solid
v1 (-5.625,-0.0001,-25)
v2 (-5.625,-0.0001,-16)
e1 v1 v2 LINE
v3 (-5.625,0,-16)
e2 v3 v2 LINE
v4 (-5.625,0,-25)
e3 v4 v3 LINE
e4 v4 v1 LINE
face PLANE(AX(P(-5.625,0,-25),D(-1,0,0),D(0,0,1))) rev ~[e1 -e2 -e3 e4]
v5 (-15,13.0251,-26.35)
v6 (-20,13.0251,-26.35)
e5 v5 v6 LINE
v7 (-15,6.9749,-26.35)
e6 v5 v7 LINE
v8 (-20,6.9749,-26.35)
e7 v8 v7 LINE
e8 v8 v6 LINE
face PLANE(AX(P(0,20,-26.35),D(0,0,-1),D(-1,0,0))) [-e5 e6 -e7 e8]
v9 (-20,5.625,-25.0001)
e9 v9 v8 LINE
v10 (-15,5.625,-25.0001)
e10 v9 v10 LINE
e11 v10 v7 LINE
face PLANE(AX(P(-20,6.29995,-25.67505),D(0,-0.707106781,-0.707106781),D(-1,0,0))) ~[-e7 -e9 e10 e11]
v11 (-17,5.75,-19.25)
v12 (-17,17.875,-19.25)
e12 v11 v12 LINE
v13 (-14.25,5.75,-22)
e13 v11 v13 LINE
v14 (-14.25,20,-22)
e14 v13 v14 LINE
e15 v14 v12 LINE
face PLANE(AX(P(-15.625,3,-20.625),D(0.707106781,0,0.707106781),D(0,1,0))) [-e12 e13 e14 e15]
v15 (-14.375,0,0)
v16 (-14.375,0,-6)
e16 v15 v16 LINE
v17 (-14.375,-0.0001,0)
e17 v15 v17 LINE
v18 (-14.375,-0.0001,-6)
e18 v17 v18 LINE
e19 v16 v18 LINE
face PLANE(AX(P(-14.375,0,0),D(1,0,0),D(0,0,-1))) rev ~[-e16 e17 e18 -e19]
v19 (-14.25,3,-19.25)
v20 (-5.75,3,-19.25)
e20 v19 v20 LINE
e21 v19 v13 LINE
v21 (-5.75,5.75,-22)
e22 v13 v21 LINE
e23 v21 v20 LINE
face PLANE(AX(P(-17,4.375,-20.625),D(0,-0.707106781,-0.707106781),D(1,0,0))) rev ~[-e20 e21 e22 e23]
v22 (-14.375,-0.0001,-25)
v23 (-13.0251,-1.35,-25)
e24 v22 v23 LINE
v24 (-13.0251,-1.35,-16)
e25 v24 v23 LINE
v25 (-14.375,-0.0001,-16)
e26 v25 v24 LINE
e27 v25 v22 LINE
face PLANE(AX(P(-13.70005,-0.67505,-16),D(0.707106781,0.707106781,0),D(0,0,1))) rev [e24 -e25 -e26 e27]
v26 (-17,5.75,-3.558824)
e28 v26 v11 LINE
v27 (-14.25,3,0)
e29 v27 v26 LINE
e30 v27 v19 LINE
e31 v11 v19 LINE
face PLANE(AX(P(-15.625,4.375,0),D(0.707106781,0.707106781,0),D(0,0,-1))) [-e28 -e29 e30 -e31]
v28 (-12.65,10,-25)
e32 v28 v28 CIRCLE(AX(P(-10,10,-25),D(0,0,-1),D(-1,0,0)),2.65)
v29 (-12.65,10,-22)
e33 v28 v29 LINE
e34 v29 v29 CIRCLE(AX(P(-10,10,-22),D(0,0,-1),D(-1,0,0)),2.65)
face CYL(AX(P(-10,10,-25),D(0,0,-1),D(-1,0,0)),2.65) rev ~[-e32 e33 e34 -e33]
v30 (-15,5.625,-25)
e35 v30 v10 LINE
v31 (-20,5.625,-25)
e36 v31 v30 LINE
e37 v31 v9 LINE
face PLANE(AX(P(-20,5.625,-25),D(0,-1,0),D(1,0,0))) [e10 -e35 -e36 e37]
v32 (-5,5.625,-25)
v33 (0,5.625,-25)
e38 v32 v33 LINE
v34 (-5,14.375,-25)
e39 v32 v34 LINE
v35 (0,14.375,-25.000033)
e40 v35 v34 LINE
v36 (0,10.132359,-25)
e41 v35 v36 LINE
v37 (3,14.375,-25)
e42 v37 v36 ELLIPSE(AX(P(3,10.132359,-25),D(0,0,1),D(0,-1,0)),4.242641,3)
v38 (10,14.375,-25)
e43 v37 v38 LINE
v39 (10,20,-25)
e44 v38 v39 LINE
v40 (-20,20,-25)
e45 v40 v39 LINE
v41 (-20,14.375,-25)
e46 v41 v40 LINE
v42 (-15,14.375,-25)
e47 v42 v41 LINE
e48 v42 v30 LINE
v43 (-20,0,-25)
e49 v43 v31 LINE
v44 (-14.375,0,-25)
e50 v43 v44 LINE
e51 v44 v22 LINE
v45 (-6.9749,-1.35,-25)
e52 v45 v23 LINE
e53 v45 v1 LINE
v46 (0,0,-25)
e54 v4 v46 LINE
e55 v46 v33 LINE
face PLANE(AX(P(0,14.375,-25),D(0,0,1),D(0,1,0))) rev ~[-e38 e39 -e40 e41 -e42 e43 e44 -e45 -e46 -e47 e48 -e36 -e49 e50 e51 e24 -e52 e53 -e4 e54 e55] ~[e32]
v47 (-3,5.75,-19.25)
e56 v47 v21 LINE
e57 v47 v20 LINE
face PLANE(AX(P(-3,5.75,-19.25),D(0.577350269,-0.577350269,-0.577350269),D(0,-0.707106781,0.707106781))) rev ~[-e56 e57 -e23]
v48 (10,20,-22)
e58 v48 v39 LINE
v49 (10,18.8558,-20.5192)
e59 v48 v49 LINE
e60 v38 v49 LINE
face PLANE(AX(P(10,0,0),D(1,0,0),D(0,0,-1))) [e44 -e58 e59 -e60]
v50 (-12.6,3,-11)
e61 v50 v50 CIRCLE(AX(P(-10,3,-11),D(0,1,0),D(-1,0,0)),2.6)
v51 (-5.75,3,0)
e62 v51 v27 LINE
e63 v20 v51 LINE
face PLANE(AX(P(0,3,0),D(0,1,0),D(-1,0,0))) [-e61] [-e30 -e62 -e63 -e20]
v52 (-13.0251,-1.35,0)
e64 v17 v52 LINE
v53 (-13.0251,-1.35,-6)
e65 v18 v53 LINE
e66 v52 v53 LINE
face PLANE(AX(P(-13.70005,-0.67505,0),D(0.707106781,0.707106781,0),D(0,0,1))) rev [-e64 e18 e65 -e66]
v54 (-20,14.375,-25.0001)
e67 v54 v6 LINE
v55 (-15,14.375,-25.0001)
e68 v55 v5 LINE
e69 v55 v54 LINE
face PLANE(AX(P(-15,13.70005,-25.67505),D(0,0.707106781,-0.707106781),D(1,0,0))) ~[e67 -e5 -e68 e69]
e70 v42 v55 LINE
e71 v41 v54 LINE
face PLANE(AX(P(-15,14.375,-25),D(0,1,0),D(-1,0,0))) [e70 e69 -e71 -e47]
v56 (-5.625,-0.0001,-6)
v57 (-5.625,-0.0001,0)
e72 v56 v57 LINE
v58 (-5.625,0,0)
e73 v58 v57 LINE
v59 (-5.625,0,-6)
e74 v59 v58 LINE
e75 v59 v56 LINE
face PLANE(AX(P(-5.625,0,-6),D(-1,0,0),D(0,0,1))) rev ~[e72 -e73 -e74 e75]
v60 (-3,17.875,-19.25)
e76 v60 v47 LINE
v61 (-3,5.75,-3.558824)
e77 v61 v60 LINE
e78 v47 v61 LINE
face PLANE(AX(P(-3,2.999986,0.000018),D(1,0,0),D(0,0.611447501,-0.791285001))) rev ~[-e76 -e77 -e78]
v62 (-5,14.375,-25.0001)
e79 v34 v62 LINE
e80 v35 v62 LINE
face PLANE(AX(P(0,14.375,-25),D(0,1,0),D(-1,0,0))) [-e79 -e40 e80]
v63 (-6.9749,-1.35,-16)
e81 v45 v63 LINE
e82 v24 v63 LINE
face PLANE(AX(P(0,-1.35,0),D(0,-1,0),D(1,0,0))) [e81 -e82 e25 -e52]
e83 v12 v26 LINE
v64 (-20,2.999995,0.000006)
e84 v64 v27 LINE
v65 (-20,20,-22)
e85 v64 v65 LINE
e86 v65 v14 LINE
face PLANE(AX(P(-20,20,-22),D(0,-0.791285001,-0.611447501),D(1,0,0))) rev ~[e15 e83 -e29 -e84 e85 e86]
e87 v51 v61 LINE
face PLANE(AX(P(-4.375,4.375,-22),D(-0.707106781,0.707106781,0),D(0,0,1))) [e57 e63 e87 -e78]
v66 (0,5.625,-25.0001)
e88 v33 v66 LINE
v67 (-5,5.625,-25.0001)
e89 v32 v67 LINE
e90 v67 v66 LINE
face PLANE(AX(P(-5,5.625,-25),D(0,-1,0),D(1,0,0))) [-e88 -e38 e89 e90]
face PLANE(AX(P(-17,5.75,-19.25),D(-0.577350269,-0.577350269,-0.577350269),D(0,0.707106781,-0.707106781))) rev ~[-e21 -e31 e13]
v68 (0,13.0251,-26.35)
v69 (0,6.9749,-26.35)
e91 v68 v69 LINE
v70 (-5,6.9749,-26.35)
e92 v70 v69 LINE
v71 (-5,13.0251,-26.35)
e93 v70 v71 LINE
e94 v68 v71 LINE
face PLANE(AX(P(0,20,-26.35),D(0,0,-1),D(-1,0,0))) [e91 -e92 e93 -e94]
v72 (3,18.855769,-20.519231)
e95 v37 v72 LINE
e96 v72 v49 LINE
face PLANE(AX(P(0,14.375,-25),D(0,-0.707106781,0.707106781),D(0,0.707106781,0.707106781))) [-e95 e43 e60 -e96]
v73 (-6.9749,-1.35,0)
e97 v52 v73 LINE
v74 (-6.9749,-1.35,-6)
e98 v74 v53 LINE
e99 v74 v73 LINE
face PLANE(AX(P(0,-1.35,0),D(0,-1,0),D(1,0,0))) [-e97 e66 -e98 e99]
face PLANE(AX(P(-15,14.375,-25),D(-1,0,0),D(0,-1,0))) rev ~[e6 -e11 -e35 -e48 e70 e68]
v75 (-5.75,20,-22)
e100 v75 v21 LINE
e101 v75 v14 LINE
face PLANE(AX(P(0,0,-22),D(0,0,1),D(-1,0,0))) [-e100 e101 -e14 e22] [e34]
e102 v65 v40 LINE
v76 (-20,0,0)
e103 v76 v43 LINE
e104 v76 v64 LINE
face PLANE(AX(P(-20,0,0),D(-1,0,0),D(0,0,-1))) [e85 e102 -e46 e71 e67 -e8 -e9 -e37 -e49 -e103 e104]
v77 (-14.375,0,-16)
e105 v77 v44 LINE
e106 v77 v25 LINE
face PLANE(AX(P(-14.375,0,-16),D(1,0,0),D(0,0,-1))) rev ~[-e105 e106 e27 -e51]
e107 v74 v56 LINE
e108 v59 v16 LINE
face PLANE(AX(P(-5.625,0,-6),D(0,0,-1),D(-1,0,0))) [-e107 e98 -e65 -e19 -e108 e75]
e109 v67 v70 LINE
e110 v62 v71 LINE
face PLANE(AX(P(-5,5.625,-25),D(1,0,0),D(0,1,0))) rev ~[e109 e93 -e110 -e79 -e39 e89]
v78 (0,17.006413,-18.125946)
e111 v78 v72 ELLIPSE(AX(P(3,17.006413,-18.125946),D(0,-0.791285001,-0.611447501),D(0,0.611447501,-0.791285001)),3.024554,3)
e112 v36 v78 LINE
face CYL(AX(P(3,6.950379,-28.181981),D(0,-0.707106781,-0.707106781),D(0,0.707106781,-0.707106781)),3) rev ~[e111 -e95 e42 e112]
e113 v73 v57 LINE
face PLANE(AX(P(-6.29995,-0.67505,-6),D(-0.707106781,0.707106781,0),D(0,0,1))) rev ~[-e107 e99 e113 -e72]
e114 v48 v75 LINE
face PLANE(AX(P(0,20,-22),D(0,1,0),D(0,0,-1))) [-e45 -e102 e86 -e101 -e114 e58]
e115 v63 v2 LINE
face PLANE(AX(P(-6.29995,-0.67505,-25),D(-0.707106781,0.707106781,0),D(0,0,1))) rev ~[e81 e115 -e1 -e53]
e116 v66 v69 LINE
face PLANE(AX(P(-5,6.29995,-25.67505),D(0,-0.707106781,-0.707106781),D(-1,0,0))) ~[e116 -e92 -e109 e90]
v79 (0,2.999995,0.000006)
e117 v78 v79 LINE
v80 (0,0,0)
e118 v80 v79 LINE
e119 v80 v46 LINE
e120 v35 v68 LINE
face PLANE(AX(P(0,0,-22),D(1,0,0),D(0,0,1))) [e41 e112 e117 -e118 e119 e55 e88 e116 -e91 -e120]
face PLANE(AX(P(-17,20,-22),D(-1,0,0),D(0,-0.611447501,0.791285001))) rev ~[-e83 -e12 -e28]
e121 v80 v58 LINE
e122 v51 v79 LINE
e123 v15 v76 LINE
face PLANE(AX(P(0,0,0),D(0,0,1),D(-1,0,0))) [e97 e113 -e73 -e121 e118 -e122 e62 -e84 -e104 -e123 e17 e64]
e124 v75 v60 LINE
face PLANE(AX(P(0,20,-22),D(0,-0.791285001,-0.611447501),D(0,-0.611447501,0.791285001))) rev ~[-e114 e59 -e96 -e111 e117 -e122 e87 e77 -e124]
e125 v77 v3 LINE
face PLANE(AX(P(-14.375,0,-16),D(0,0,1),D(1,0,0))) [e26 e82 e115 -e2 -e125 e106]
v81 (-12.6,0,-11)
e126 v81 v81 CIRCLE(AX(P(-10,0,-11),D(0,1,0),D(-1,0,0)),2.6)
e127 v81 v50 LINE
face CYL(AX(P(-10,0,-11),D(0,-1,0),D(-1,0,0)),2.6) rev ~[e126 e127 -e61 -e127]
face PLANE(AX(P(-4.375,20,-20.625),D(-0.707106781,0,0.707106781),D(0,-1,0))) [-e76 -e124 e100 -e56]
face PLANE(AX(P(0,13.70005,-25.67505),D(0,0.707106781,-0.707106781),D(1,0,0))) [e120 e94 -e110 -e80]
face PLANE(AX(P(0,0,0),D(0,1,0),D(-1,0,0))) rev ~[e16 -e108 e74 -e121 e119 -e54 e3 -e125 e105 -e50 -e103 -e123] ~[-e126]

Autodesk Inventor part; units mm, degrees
ref_plane "YZ Plane" through (0, 0, 0) normal (1, 0, 0) x (0, 1, 0)
ref_plane "XZ Plane" through (0, 0, 0) normal (0, 1, 0) x (-1, 0, 0)
sketch "Sketch1" plane through (0, 0, 0) normal (0, 1, 0) x (-1, 0, 0)
  line L0 (0, 0) -> (20, 0)
  line L1 (20, 0) -> (20, -25)
  line L2 (20, -25) -> (0, -25)
  line L3 (0, -25) -> (0, 0)
  circle A0 centre (10, -11) radius 2.6
  line L4 (20, -25) -> (0, -25)
  line L5 (0, -25) -> (0, -22)
  line L6 (0, -22) -> (20, -22)
  line L7 (20, -22) -> (20, -25)
  line L8 (0, -22) -> (20, 0) construction
  point P0 (10, -11)
  dimension "d2" = 20
  dimension "d3" = 25
  dimension "d4" = 5.2
  dimension "d7" = 3
extrude "Extrusion1" add sketch "Sketch1" along normal blind 3
extrude "Extrusion2" add sketch "Sketch1" along normal blind 20 contours L6 L1 L2 L3
sketch "Sketch2" plane through (0, 0, -25) normal (0, 0, -1) x (-1, 0, 0)
  line L0 (0, 0) -> (0, 20) projected
  line L1 (20, 0) -> (20, 20) projected
  line L2 (0, 20) -> (20, 0) construction
  circle A0 centre (10, 10) radius 2.65
  dimension "d10" = 5.3
extrude "Extrusion3" cut sketch "Sketch2" against normal through all
ref_plane "Work Plane1" through (-20, 20, -22) normal (0, -0.791285, -0.6114475) x (1, 0, 0)
sketch "Sketch3" plane through (-20, 20, -22) normal (0, -0.791285, -0.6114475) x (1, 0, 0)
  line L0 (0, 27.8029) -> (20, 27.8029) projected
  line L1 (0, 0) -> (20, 0) projected
  line L2 (0, 10.3946) -> (0, 0) projected
  line L3 (0, 0) -> (3, 0)
  line L4 (3, 0) -> (3, 27.8029)
  line L5 (3, 27.8029) -> (0, 27.8029)
  line L6 (0, 27.8029) -> (0, 0)
  line L7 (20, 27.8029) -> (17, 27.8029)
  line L8 (17, 27.8029) -> (17, 0)
  line L9 (17, 0) -> (20, 0)
  line L10 (20, 0) -> (20, 27.8029)
  point P0 (20, 29.6372)
  point P1 (20, 0)
  dimension "d13" = 3
  dimension "d14" = 3
extrude "Extrusion4" add sketch "Sketch3" along normal up to next contours L0 L4 L1 L2 L6 | L0 L10 L1 L8
chamfer "Chamfer1" distance 2.75 angle 45 5 edges at (-10, 3, -22) (-3, 11.5, -22) (-3, 3, -11) (-17, 3, -11) (-17, 11.5, -22)
sketch "Sketch4" plane through (0, 0, 0) normal (0, -1, 0) x (1, 0, 0)
  line L0 (0, -25) -> (-20, -25) projected
  line L1 (-20, 0) -> (0, 0) projected
  line L2 (-14.375, -25) -> (-5.625, -25)
  line L3 (-5.625, -25) -> (-5.625, 0)
  line L4 (-5.625, 0) -> (-14.375, 0)
  line L5 (-14.375, 0) -> (-14.375, -25)
  circle A0 centre (-10, -11) radius 2.6 projected
  line L6 (-10, -25) -> (-10, 0) construction
  line L7 (-5.625, -6) -> (-14.375, -6)
  line L8 (-14.375, -6) -> (-14.375, -16)
  line L9 (-14.375, -16) -> (-5.625, -16)
  line L10 (-5.625, -16) -> (-5.625, -6)
  line L11 (-14.375, -16) -> (-5.625, -6) construction
  point P0 (-14.375, 0)
  dimension "d32" = 8.75
  dimension "d40" = 10
extrude "Extrusion5" add sketch "Sketch4" along normal blind 1.35 contours L0 L5 L9 L3 | L7 L5 L1 L3
sketch "Sketch5" plane through (0, 20, -25) normal (0, 0, -1) x (-1, 0, 0)
  line L0 (0, 0) -> (0, -17) projected
  line L1 (20, -17) -> (20, 0) projected
  line L2 (0, -5.625) -> (20, -5.625)
  line L3 (20, -5.625) -> (20, -14.375)
  line L4 (20, -14.375) -> (0, -14.375)
  line L5 (0, -14.375) -> (0, -5.625)
  line L6 (0, -14.375) -> (20, -5.625) construction
  circle A0 centre (10, -10) radius 2.65 projected
  line L7 (5, -5.625) -> (15, -5.625)
  line L8 (15, -5.625) -> (15, -14.375)
  line L9 (15, -14.375) -> (5, -14.375)
  line L10 (5, -14.375) -> (5, -5.625)
  line L11 (5, -5.625) -> (15, -14.375) construction
  point P0 (0, -20)
  point P1 (0, -14.375)
  dimension "d26" = 8.75
  dimension "d39" = 10
extrude "Extrusion6" add sketch "Sketch5" along normal blind 1.35 contours L2 L10 L4 L0 | L2 L1 L4 L8
chamfer "Chamfer2" distance 1.35 angle 45 8 edges at (-17.5, 5.625, -26.35) (-2.5, 5.625, -26.35) (-17.5, 14.375, -26.35) (-2.5, 14.375, -26.35) (-14.375, -1.35, -3) (-14.375, -1.35, -20.5) (-5.625, -1.35, -3) (-5.625, -1.35, -20.5)
sketch "Sketch8" plane through (0, 0, 0) normal (1, 0, 0) x (0, 0, -1)
  line L0 (25, 14.375) -> (26.35, 13.025) projected
  line L1 (25, 14.375) -> (25, 20) projected
  line L2 (22, 20) -> (25, 20) projected
  line L3 (22, 20) -> (0, 3) projected
  line L4 (0, 0) -> (0, 3) projected
  line L5 (0, 0) -> (25, 0) projected
  line L6 (25, 0) -> (25, 5.625) projected
  line L7 (26.35, 6.975) -> (25, 5.625) projected
  line L8 (26.35, 13.025) -> (26.35, 6.975) projected
  line L9 (22, 20) -> (19.25, 17.875) projected
  line L10 (25, 14.375) -> (20.5192, 18.8558)
  line L11 (25, 14.375) -> (26.35, 13.025) projected
extrude "Extrusion9" add sketch "Sketch8" along normal blind 10 contours L10 L3 L2 L1
fillet "Fillet1" radius 3 1 edges at (0, 16.6154, -22.7596)
properties part number "Soporte Actuador" material "PET Plastic"
